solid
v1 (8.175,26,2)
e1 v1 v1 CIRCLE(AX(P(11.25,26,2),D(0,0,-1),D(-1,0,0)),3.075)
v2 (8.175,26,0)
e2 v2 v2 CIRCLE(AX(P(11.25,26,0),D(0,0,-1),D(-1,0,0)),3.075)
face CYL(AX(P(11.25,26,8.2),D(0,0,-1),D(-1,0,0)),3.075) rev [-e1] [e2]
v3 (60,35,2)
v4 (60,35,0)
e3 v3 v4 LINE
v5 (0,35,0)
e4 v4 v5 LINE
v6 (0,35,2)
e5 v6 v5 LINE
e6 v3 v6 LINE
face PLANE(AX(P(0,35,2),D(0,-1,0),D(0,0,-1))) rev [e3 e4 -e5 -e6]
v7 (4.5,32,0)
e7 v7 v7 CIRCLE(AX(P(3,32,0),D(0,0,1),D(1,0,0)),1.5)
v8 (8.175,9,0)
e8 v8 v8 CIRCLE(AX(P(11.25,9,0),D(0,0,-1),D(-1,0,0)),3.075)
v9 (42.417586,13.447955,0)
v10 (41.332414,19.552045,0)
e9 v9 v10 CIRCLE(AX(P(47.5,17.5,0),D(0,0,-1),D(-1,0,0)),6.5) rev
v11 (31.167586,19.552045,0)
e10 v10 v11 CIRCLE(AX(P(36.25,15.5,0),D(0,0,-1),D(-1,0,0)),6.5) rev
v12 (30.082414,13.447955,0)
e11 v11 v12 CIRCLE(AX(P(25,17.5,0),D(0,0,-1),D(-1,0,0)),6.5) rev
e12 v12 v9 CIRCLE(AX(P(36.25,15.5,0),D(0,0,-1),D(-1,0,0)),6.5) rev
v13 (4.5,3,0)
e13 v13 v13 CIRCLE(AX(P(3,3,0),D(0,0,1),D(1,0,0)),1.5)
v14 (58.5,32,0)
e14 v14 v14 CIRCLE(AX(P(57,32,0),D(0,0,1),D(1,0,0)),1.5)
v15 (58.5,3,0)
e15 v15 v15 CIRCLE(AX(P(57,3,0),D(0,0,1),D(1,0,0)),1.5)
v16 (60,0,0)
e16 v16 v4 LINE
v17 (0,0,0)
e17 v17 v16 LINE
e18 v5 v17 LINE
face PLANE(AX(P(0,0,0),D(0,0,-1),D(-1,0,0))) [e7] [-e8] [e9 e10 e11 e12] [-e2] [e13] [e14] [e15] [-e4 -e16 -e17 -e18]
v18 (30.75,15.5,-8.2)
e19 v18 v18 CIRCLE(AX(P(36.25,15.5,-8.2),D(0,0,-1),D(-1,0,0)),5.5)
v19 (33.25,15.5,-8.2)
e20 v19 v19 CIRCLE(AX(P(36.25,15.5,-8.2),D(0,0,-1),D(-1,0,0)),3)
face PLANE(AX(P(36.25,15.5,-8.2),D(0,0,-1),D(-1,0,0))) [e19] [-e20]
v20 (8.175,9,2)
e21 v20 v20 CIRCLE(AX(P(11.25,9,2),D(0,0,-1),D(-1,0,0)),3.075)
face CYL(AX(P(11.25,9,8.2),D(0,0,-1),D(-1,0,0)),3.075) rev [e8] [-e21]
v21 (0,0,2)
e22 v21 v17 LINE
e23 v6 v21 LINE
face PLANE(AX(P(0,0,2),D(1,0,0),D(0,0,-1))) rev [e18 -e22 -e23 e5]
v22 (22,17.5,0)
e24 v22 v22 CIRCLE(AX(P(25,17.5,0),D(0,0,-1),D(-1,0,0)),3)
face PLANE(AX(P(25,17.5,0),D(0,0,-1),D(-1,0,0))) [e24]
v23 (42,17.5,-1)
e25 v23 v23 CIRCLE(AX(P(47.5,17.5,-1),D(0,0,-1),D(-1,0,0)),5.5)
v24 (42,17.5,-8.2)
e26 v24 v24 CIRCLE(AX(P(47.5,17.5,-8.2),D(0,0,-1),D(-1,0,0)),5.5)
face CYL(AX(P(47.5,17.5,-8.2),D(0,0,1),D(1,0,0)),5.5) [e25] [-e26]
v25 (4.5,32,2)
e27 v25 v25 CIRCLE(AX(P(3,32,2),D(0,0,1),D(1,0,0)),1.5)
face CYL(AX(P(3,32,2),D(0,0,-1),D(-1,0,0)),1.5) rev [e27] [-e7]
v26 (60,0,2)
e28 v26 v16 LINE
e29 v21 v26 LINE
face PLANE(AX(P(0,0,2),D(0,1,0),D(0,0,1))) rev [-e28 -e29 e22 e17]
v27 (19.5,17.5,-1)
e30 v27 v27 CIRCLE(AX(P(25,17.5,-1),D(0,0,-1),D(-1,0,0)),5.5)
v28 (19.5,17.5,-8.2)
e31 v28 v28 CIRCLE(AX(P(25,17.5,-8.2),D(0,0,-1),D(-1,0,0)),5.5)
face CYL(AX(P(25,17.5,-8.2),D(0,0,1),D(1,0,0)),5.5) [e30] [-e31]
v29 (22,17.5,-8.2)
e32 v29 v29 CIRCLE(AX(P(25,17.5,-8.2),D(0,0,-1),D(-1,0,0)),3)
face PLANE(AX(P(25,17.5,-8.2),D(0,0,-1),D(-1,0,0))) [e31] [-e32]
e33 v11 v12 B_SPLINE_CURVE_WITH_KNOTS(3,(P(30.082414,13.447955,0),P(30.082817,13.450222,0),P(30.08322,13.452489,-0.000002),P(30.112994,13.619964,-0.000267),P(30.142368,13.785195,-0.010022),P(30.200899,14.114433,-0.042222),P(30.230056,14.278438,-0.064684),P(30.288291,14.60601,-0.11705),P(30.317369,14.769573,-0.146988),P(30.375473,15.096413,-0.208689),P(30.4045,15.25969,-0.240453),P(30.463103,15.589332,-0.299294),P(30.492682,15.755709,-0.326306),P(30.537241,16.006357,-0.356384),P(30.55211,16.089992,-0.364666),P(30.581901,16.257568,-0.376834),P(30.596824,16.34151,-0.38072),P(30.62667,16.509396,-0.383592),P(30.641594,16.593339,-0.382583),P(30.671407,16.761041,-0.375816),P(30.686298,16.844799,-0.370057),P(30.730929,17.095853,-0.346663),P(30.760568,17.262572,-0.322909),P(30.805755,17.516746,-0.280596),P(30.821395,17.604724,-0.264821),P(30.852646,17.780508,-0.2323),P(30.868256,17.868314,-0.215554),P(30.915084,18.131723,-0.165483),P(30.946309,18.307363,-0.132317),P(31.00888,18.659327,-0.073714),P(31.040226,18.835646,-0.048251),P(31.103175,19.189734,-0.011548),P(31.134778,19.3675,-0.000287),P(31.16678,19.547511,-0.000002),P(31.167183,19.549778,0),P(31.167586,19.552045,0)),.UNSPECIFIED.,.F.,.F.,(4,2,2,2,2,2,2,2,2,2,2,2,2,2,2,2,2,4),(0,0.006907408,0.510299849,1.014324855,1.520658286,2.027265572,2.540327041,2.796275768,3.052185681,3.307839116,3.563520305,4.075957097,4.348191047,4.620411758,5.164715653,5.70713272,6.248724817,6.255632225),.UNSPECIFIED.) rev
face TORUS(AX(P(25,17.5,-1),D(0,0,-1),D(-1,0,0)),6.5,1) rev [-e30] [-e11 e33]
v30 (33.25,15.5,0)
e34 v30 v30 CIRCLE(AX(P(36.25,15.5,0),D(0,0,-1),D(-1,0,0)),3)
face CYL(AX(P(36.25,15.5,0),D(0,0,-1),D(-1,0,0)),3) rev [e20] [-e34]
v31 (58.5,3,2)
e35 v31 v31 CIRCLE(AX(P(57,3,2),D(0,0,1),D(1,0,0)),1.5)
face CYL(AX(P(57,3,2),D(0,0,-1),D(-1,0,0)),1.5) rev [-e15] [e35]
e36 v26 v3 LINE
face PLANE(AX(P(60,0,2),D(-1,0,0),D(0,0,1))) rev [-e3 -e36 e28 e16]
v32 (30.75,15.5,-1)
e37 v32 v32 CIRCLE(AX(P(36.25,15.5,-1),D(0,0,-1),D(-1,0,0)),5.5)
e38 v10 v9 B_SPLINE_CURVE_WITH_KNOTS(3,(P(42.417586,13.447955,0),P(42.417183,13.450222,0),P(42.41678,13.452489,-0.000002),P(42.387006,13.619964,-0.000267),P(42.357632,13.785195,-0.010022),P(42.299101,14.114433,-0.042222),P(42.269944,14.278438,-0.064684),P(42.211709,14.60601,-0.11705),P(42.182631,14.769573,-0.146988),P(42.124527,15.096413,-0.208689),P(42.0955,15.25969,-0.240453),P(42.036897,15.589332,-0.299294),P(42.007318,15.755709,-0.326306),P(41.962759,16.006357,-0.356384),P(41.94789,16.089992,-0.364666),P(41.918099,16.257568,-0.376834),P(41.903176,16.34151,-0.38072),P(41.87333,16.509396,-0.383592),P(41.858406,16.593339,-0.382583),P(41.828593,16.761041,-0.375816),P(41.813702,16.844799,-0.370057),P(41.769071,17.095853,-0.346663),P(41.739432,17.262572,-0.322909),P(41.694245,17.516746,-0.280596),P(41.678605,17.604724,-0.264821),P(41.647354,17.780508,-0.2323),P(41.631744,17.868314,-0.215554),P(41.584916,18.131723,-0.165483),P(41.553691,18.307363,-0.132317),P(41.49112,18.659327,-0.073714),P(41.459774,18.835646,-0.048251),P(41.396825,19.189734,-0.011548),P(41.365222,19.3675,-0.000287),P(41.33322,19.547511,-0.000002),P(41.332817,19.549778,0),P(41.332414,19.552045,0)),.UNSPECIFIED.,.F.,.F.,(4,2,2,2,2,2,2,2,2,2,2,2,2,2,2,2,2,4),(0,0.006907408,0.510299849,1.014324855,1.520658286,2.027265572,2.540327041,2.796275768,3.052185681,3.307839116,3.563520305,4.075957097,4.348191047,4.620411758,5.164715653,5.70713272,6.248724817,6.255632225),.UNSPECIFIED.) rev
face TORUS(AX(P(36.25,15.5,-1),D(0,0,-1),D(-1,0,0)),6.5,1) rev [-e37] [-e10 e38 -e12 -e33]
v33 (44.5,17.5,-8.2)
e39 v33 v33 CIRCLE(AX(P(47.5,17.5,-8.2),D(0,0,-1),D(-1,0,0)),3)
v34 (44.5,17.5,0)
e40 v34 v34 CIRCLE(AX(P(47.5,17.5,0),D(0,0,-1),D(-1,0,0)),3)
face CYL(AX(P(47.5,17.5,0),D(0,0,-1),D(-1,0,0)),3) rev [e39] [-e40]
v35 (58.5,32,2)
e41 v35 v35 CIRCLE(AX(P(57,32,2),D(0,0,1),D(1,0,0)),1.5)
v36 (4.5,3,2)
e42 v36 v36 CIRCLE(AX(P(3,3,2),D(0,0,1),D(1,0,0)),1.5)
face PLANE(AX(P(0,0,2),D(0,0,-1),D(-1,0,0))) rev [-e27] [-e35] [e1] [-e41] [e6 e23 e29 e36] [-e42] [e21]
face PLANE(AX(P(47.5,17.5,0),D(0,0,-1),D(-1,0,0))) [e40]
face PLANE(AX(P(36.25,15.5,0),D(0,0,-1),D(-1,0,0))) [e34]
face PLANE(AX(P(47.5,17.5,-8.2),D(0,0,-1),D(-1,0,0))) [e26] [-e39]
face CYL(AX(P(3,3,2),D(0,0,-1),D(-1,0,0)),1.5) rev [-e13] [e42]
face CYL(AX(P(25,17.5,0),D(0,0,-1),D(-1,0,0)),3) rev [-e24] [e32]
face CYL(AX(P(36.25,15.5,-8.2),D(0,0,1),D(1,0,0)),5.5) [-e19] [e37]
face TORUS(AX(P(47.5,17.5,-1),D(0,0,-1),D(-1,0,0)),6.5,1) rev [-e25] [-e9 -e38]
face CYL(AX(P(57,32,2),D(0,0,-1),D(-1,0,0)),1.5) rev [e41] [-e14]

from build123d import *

# Parameters (mm, degrees)
SKETCH1_W           = 60
SKETCH1_H           = 35
SKETCH1_R           = 1.5
BOSS_EXTRUDE1_DEPTH = 2
SKETCH2_R           = 5.5
BOSS_EXTRUDE2_DEPTH = 8.2
SKETCH5_R           = 3
CUT_EXTRUDE2_DEPTH  = 8.2
SKETCH6_R           = 3.075
CUT_EXTRUDE3_DEPTH  = 8.2
FILLET4_R           = 1


with BuildPart() as part:
    # Sketch1 → Boss-Extrude1 (new body)
    with BuildSketch(Plane.XY):
        with Locations((30, 17.5)):
            Rectangle(SKETCH1_W, SKETCH1_H)
        with Locations((57, 32)):
            Circle(SKETCH1_R, mode=Mode.SUBTRACT)
        with Locations((57, 3)):
            Circle(SKETCH1_R, mode=Mode.SUBTRACT)
        with Locations((3, 3)):
            Circle(SKETCH1_R, mode=Mode.SUBTRACT)
        with Locations((3, 32)):
            Circle(SKETCH1_R, mode=Mode.SUBTRACT)
    extrude(amount=BOSS_EXTRUDE1_DEPTH)

    # Sketch2 → Boss-Extrude2 (add)
    with BuildSketch(Plane(origin=(0, 0, 0), x_dir=(-1, 0, 0), z_dir=(0, 0, -1))):
        with Locations((-36.25, 15.5)):
            Circle(SKETCH2_R)
        with Locations((-25, 17.5)):
            Circle(SKETCH2_R)
        with Locations((-47.5, 17.5)):
            Circle(SKETCH2_R)
    extrude(amount=BOSS_EXTRUDE2_DEPTH)

    # Sketch5 → Cut-Extrude2 (cut)
    with BuildSketch(Plane(origin=(0, 0, -8.2), x_dir=(-1, 0, 0), z_dir=(0, 0, -1))):
        with Locations((-47.5, 17.5)):
            Circle(SKETCH5_R)
        with Locations((-36.25, 15.5)):
            Circle(SKETCH5_R)
        with Locations((-25, 17.5)):
            Circle(SKETCH5_R)
    extrude(amount=-CUT_EXTRUDE2_DEPTH, mode=Mode.SUBTRACT)

    # Sketch6 → Cut-Extrude3 (cut)
    with BuildSketch(Plane(origin=(0, 0, 0), x_dir=(-1, 0, 0), z_dir=(0, 0, -1))):
        with Locations((-11.25, 26)):
            Circle(SKETCH6_R)
        with Locations((-11.25, 9)):
            Circle(SKETCH6_R)
    extrude(amount=-CUT_EXTRUDE3_DEPTH, mode=Mode.SUBTRACT)

    # Fillet4
    # the kernel refuses this fillet: 1 mm, written as the material it adds along each edge
    with BuildSketch(Plane(origin=(36.25, 15.5, 0), x_dir=(-1, 0, 0), z_dir=(0, -1, 0))) as fillet4_piece_1:
        with BuildLine():
            CenterArc((5.5 + FILLET4_R, FILLET4_R), FILLET4_R, 180, 90)
            Line((5.5, FILLET4_R), (5.5, 0))
            Line((5.5, 0), (5.5 + FILLET4_R, 0))
        make_face()
    revolve(axis=Axis((36.25, 15.5, 0), (0, 0, -1)))
    with BuildSketch(Plane(origin=(25, 17.5, 0), x_dir=(-1, 0, 0), z_dir=(0, -1, 0))) as fillet4_piece_2:
        with BuildLine():
            CenterArc((5.5 + FILLET4_R, FILLET4_R), FILLET4_R, 180, 90)
            Line((5.5, FILLET4_R), (5.5, 0))
            Line((5.5, 0), (5.5 + FILLET4_R, 0))
        make_face()
    revolve(axis=Axis((25, 17.5, 0), (0, 0, -1)))
    with BuildSketch(Plane(origin=(47.5, 17.5, 0), x_dir=(-1, 0, 0), z_dir=(0, -1, 0))) as fillet4_piece_3:
        with BuildLine():
            CenterArc((5.5 + FILLET4_R, FILLET4_R), FILLET4_R, 180, 90)
            Line((5.5, FILLET4_R), (5.5, 0))
            Line((5.5, 0), (5.5 + FILLET4_R, 0))
        make_face()
    revolve(axis=Axis((47.5, 17.5, 0), (0, 0, -1)))


solid = part.part
